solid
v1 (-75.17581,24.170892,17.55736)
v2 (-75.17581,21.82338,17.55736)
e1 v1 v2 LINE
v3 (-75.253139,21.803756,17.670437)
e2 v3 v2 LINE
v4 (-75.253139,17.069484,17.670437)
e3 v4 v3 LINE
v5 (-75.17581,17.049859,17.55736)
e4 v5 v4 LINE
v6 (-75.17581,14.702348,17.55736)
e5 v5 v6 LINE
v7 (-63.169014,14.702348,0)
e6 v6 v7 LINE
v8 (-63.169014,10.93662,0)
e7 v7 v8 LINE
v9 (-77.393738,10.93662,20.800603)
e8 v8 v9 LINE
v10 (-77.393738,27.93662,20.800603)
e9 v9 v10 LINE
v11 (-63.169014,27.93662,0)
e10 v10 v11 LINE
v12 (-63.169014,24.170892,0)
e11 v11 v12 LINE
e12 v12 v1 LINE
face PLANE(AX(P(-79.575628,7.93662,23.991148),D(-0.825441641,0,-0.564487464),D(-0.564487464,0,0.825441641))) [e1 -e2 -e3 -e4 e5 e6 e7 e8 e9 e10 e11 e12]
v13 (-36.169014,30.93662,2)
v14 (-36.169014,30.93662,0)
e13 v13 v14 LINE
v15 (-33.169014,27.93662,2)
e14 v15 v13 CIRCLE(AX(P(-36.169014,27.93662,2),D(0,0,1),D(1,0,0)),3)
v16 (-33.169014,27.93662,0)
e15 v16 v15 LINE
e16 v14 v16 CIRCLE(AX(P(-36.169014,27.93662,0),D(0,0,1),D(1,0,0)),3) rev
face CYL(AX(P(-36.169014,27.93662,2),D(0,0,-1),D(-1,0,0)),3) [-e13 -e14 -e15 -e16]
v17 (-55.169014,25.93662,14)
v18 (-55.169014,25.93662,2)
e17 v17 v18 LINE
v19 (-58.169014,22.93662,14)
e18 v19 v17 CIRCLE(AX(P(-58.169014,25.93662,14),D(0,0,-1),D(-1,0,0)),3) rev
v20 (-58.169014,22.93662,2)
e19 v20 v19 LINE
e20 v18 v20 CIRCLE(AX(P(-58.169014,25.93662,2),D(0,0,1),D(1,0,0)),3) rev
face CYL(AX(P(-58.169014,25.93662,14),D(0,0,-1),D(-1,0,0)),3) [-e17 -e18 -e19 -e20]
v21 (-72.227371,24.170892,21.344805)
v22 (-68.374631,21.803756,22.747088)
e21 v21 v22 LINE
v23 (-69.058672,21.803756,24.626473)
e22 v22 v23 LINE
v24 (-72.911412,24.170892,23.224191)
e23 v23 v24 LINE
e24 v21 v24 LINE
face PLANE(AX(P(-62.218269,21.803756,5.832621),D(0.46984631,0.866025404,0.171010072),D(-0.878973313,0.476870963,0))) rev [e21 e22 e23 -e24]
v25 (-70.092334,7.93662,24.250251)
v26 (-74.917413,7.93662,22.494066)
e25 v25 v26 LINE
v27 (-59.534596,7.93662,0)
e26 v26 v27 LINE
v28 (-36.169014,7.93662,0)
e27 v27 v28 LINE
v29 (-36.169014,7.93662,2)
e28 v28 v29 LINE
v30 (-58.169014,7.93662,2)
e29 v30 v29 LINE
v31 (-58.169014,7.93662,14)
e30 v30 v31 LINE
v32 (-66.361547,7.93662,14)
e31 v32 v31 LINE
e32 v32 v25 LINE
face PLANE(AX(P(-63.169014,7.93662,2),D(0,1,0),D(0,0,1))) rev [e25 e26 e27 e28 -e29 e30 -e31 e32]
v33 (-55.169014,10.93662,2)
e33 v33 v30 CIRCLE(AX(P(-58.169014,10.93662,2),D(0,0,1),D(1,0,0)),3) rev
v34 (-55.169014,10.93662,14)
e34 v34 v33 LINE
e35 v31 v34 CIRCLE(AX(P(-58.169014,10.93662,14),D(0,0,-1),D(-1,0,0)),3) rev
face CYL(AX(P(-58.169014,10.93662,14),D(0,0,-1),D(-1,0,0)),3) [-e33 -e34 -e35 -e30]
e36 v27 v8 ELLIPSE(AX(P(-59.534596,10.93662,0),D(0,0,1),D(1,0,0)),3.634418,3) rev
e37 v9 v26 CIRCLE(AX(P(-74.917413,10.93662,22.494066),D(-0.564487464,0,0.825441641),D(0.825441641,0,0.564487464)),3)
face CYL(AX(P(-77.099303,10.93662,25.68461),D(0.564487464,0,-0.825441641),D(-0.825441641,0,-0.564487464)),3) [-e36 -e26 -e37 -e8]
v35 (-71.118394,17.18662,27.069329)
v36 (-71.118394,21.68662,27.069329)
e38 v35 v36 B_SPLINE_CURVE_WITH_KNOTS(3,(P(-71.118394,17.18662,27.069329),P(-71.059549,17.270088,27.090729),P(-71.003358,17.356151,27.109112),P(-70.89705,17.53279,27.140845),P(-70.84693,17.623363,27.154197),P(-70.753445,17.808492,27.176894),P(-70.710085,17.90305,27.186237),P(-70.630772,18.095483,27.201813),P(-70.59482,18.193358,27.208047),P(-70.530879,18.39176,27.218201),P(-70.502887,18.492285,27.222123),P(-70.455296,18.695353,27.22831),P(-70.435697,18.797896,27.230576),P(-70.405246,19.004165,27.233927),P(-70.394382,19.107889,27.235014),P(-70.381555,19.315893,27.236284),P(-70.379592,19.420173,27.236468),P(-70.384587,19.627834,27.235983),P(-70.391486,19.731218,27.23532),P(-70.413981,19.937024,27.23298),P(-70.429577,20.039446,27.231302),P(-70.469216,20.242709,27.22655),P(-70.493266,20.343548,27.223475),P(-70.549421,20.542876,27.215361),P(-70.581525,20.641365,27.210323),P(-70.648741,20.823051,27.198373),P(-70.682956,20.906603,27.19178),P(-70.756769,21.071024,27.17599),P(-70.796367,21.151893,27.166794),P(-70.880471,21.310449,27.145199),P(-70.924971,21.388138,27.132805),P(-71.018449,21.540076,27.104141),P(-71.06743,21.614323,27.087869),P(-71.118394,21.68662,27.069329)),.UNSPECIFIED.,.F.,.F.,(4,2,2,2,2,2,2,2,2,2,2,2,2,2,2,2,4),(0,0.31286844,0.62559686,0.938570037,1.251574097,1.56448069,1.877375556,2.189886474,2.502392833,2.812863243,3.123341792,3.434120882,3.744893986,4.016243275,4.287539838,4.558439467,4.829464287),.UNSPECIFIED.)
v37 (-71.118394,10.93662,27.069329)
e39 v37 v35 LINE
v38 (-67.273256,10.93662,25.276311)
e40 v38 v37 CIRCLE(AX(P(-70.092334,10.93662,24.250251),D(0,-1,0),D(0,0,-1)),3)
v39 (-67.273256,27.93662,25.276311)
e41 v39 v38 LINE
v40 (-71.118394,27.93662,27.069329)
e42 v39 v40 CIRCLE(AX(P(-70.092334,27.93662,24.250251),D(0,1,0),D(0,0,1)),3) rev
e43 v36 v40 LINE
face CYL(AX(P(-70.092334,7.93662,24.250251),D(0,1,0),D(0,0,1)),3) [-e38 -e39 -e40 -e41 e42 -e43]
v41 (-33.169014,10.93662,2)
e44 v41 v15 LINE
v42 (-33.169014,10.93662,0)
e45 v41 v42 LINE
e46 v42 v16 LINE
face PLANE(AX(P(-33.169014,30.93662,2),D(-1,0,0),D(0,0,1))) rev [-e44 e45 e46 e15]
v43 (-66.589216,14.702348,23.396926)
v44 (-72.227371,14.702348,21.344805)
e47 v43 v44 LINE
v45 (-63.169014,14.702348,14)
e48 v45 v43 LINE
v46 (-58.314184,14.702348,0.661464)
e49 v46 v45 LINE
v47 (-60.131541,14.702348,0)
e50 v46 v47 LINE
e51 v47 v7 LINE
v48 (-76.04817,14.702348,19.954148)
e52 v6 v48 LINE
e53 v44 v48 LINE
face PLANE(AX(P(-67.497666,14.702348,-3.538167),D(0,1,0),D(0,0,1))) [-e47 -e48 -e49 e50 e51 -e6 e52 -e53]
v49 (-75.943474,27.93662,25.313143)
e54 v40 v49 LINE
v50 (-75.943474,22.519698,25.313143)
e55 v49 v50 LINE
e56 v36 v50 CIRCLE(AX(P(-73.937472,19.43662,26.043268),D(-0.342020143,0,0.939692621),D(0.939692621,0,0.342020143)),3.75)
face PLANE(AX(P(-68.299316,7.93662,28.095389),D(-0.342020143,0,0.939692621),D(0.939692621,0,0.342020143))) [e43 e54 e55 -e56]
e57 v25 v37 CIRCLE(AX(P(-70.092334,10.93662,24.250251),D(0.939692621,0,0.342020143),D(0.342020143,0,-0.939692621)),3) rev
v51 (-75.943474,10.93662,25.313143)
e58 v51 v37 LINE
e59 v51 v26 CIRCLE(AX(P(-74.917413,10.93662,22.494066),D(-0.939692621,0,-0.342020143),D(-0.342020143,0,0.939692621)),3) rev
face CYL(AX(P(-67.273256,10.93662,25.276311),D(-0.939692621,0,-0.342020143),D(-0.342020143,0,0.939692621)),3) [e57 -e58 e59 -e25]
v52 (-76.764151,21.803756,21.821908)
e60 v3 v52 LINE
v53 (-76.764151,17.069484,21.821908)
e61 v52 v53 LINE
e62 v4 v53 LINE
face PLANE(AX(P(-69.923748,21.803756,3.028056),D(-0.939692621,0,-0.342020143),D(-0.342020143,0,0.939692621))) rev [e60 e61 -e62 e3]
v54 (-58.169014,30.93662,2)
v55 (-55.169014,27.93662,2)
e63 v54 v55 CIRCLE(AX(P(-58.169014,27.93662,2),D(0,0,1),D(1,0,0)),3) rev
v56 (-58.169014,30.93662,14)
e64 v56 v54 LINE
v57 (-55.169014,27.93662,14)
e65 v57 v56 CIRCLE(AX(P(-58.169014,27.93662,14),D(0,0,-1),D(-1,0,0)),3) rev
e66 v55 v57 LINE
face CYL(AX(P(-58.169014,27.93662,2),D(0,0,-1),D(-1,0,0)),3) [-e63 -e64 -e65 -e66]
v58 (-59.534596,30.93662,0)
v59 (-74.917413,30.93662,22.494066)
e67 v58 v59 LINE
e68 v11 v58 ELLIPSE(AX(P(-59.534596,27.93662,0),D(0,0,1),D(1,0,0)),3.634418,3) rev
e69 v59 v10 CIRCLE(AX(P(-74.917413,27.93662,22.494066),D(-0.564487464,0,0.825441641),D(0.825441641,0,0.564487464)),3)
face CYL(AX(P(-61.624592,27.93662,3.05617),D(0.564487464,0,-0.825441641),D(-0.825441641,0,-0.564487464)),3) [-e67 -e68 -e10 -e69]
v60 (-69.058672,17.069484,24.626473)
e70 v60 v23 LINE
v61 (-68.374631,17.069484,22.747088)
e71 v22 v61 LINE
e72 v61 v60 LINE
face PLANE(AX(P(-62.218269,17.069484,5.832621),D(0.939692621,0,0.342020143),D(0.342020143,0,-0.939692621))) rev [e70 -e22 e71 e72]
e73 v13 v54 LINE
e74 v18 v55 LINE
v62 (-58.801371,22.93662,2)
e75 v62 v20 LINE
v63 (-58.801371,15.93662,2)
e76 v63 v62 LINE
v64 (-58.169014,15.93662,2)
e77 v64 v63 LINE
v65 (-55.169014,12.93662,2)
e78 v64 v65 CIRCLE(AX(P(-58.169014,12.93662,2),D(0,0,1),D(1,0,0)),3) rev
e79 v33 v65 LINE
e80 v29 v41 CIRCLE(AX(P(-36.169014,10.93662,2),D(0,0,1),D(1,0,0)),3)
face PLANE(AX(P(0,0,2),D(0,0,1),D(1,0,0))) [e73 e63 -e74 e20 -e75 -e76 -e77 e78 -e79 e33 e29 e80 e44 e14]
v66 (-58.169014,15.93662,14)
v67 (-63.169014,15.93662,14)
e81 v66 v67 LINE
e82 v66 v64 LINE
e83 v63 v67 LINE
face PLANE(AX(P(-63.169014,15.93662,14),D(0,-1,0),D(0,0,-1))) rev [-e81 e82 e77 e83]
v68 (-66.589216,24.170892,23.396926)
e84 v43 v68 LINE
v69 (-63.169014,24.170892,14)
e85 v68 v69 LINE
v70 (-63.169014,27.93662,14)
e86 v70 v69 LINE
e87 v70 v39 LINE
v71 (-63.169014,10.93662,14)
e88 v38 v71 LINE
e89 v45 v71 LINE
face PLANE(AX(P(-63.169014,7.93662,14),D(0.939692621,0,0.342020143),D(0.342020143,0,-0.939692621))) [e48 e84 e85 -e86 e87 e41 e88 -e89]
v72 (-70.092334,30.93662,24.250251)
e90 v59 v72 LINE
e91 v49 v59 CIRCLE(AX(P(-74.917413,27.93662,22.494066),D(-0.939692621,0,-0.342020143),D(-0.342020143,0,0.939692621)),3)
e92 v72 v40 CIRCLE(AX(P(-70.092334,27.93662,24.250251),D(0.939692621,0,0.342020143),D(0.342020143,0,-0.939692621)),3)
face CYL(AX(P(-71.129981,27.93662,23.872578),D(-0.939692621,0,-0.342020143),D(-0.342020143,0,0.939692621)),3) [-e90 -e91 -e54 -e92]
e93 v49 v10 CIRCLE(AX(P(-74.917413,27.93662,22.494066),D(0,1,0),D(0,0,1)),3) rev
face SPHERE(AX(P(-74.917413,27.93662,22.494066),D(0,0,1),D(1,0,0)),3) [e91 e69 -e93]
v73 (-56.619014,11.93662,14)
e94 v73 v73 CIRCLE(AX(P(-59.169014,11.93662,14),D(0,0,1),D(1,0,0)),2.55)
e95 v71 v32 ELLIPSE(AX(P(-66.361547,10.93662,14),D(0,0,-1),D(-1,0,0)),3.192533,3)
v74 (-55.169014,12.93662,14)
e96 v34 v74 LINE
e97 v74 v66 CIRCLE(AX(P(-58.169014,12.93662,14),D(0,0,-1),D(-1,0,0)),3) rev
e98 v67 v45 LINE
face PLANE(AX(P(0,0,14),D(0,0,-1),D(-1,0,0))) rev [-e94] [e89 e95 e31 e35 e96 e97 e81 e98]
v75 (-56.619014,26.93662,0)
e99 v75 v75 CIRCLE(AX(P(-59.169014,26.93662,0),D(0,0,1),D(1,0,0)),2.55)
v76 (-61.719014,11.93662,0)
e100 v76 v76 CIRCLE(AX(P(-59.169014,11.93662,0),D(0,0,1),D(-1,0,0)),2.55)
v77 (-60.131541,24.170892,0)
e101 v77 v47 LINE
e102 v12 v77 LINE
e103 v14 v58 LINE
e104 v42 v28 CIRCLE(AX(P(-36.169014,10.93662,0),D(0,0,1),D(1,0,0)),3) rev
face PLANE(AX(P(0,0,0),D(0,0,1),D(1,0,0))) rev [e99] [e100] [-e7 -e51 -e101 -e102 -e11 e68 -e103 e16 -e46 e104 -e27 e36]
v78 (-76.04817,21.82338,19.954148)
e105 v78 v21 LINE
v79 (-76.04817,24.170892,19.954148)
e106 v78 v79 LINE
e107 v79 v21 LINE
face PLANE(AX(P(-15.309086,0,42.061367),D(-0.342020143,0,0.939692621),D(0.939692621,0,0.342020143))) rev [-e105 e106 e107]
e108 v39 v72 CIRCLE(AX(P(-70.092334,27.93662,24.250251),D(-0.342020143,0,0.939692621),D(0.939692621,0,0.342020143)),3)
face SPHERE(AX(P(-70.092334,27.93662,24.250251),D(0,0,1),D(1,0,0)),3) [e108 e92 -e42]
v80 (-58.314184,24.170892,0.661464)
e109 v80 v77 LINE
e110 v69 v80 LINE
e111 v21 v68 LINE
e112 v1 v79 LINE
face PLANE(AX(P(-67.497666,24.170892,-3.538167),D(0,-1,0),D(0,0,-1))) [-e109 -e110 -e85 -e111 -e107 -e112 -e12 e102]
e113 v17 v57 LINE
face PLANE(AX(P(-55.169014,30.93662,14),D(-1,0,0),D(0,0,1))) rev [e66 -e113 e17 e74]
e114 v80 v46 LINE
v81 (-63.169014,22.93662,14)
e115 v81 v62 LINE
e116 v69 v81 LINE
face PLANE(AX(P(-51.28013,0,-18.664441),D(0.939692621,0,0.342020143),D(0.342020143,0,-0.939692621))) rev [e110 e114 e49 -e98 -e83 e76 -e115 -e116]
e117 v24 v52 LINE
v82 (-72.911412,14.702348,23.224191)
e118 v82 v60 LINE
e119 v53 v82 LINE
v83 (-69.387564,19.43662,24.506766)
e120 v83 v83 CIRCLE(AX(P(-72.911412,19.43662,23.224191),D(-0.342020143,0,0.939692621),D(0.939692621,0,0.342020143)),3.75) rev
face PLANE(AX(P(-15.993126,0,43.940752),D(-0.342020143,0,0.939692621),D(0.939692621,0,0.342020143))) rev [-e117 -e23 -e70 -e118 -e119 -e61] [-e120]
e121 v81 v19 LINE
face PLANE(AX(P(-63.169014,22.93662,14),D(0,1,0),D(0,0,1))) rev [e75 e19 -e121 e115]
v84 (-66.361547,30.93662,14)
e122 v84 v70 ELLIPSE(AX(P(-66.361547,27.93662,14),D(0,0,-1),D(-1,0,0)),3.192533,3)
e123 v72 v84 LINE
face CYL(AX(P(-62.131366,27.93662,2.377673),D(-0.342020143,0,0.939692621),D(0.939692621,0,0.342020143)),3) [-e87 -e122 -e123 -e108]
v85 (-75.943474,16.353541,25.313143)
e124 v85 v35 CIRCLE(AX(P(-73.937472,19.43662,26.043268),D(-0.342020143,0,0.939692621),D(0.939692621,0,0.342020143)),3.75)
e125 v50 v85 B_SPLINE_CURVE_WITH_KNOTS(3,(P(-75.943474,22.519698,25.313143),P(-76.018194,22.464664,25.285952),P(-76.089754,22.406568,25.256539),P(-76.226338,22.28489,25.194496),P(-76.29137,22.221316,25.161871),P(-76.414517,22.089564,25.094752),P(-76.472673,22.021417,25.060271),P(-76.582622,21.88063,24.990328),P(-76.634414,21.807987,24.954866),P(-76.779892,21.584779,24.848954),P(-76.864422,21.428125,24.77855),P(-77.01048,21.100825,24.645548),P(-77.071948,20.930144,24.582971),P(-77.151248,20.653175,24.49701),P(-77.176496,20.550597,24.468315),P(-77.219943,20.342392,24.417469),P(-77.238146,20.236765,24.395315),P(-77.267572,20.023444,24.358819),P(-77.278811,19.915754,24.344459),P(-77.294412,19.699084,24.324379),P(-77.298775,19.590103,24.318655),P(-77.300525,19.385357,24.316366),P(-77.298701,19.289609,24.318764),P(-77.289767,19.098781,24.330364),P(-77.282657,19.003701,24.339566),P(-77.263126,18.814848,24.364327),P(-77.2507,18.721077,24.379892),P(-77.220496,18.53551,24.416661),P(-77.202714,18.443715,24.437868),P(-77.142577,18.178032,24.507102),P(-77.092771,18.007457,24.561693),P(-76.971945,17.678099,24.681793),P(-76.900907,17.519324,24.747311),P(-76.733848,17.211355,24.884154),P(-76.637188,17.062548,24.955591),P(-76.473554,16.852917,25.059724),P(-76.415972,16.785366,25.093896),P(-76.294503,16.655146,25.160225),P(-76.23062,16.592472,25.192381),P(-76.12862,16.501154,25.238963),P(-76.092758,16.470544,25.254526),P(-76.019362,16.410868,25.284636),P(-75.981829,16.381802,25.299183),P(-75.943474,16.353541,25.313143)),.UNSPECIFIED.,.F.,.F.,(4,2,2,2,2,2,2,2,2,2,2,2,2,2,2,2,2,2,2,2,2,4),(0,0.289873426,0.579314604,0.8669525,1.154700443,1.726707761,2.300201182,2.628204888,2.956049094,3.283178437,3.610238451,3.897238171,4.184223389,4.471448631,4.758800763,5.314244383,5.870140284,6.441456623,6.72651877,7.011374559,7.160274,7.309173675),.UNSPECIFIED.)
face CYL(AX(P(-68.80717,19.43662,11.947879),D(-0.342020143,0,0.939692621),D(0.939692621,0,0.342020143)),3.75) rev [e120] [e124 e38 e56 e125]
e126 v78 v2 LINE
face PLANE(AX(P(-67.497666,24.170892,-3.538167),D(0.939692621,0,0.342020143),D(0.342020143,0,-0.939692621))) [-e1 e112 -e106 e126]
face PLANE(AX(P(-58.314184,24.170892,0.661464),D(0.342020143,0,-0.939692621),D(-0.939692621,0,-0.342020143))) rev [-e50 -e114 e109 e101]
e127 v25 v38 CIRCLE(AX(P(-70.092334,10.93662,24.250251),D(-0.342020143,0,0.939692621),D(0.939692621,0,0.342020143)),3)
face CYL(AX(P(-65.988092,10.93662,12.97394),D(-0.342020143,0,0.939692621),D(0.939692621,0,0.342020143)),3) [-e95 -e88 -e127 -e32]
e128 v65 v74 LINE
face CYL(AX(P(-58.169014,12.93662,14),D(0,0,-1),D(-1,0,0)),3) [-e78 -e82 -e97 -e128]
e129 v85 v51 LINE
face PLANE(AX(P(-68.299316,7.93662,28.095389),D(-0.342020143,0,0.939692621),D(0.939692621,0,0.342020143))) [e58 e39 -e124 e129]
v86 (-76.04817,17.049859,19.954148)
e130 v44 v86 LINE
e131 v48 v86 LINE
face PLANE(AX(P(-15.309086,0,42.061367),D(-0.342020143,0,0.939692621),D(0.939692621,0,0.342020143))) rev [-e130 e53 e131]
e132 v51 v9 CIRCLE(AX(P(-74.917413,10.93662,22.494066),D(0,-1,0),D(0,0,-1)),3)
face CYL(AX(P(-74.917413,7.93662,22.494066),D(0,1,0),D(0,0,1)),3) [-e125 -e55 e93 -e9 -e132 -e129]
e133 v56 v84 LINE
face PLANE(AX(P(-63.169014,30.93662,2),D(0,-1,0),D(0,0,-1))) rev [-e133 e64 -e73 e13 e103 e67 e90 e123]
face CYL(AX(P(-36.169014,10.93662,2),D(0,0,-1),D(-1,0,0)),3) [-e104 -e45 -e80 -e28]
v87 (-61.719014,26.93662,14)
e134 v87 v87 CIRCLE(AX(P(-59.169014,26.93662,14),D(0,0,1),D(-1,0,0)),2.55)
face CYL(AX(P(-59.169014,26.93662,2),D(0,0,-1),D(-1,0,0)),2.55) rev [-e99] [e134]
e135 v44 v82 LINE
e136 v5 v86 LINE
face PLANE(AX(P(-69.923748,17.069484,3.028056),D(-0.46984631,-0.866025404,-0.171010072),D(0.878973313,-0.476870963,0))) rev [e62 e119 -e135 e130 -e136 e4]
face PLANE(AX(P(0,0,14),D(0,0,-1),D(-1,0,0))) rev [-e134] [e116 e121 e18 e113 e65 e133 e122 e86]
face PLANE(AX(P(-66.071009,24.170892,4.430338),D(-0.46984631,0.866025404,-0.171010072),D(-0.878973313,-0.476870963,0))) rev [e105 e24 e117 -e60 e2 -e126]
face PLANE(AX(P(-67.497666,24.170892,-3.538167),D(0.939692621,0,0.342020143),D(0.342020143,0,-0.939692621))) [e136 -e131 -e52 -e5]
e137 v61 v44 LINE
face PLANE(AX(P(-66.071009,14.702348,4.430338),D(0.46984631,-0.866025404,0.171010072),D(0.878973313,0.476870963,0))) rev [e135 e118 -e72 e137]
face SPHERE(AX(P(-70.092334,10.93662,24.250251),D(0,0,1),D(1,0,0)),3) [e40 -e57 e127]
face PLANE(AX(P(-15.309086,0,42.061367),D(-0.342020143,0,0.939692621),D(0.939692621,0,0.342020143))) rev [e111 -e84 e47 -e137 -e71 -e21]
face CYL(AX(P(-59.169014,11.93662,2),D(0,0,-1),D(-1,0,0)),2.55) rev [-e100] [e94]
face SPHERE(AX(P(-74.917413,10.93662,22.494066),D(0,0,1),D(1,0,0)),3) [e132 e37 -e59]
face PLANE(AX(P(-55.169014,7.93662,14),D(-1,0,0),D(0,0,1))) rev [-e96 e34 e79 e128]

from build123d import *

# Parameters (mm, degrees)
CROQUIS3_W              = 30
CROQUIS3_H              = 23
CROQUIS3_R              = 2.55
SALIENTE_EXTRUIR2_DEPTH = 2
CROQUIS5_W              = 8
CROQUIS5_H              = 8
CROQUIS5_R              = 2.55
SALIENTE_EXTRUIR3_DEPTH = 12
SALIENTE_EXTRUIR4_DEPTH = 23
CROQUIS7_R              = 3.75
CORTAR_EXTRUIR1_DEPTH   = 15
CORTAR_EXTRUIR7_START   = -3
CORTAR_EXTRUIR7_DEPTH   = 20
CORTAR_EXTRUIR8_START   = 2
CROQUIS14_W             = 8.13201816
CROQUIS14_H             = 9.468544415
CORTAR_EXTRUIR8_DEPTH   = 25
CROQUIS15_W             = 24.194573687
CROQUIS15_H             = 9.468544415
CORTAR_EXTRUIR9_DEPTH   = 1.933991
REDONDEO1_R             = 3


with BuildPart() as part:
    # Croquis3 → Saliente-Extruir2 (new body)
    with BuildSketch(Plane.XY):
        with Locations((-48.169014085, 19.436619718)):
            Rectangle(CROQUIS3_W, CROQUIS3_H)
        with Locations((-59.169014085, 26.936619718)):
            Circle(CROQUIS3_R, mode=Mode.SUBTRACT)
        with Locations(Location((-59.169014085, 11.936619718, 0), (0, 0, 180))):
            Circle(CROQUIS3_R, mode=Mode.SUBTRACT)
    extrude(amount=SALIENTE_EXTRUIR2_DEPTH)

    # Croquis5 → Saliente-Extruir3 (add)
    # profile 1 of 2: a face of its own
    with BuildSketch(Plane.XY.offset(2)):
        with Locations((-59.169014085, 11.936619718)):
            Rectangle(CROQUIS5_W, CROQUIS5_H)
        with Locations(Location((-59.169014085, 11.936619718, 0), (0, 0, 180))):
            Circle(CROQUIS5_R, mode=Mode.SUBTRACT)
    # profile 2 of 2: a face of its own
    with BuildSketch(Plane.XY.offset(2)):
        with Locations((-59.169014085, 26.936619718)):
            Rectangle(CROQUIS5_W, CROQUIS5_H)
        with Locations(Location((-59.169014085, 26.936619718, 0), (0, 0, 180))):
            Circle(CROQUIS5_R, mode=Mode.SUBTRACT)
    extrude(amount=SALIENTE_EXTRUIR3_DEPTH)

    # Croquis6 → Saliente-Extruir4 (add)
    with BuildSketch(Plane(origin=(0, 30.936619718, 0), x_dir=(1, 0, 0), z_dir=(0, 1, 0))):
        Polygon((-63.169014085, -14), (-68.299316234, -28.095389312), (-79.575627684, -23.991147592), (-63.169014085, 0), align=None)
    extrude(amount=-SALIENTE_EXTRUIR4_DEPTH)

    # Croquis7 → Cortar-Extruir1 (cut)
    with BuildSketch(Plane(origin=(-17.019186352, 0, 46.759830198), x_dir=(0.9396926207859082, 0, 0.3420201433256694), z_dir=(-0.3420201433256694, 0, 0.9396926207859083))):
        with Locations((-60.571174391, 19.436619718)):
            Circle(CROQUIS7_R)
    extrude(amount=-CORTAR_EXTRUIR1_DEPTH, mode=Mode.SUBTRACT)

    # Croquis13 → Cortar-Extruir7 (cut)
    with BuildSketch(Plane(origin=(-17.019186352, 0, 46.759830198), x_dir=(0.9396926207859082, 0, 0.3420201433256694), z_dir=(-0.3420201433256694, 0, 0.9396926207859083)).offset(CORTAR_EXTRUIR7_START)):
        Polygon((-60.571174391, 14.702347511), (-56.471174391, 17.069483615), (-56.471174391, 21.803755822), (-60.571174391, 24.170891926), (-64.671174391, 21.803755822), (-64.671174391, 17.069483615), align=None)
    extrude(amount=-CORTAR_EXTRUIR7_DEPTH, mode=Mode.SUBTRACT)

    # Croquis14 → Cortar-Extruir8 (cut)
    with BuildSketch(Plane(origin=(-15.993125922, 0, 43.940752336), x_dir=(-0.9396926207859081, 0, -0.34202014332566977), z_dir=(0.3420201433256697, 0, -0.939692620785908)).offset(CORTAR_EXTRUIR8_START)):
        with Locations((60.571174391, 19.436619719)):
            Rectangle(CROQUIS14_W, CROQUIS14_H)
    extrude(amount=CORTAR_EXTRUIR8_DEPTH, mode=Mode.SUBTRACT)

    # Croquis15 → Cortar-Extruir9 (cut)
    with BuildSketch(Plane(origin=(-53.097486879, 0, -19.325904738), x_dir=(-0.34202014332566977, 0, 0.9396926207859081), z_dir=(-0.939692620785908, 0, -0.3420201433256697))):
        with Locations((32.663485099, 19.436619719)):
            Rectangle(CROQUIS15_W, CROQUIS15_H)
    extrude(amount=-CORTAR_EXTRUIR9_DEPTH, mode=Mode.SUBTRACT)

    # Redondeo1
    # the kernel refuses this fillet: 3 mm, written as the material it takes off along each edge
    with BuildSketch(Plane(origin=(-70.092333667, 10.936619718, 24.250251019), x_dir=(0.9396926207859081, 0, 0.34202014332566966), z_dir=(0, -1, 0))) as redondeo1_piece_1_section:
        Polygon((0, 0), (REDONDEO1_R * 1.02, 0), (REDONDEO1_R * 1.02, REDONDEO1_R * 1.02), (0, REDONDEO1_R * 1.02), align=None)
    redondeo1_piece_1 = extrude(amount=REDONDEO1_R * 1.02, mode=Mode.PRIVATE)
    redondeo1_piece_1 = redondeo1_piece_1 - Plane(origin=(-70.092333667, 10.936619718, 24.250251019), x_dir=(-0.4226182617406987, 0, -0.9063077870366504), z_dir=(0, -1, 0)) * Sphere(REDONDEO1_R, mode=Mode.PRIVATE)
    add(redondeo1_piece_1, mode=Mode.SUBTRACT)
    with BuildSketch(Plane(origin=(-74.917413437, 10.936619718, 22.494065605), x_dir=(-0.3420201433256695, 0, 0.9396926207859081), z_dir=(0, -1, 0))) as redondeo1_piece_2_section:
        Polygon((0, 0), (REDONDEO1_R * 1.02, 0), (REDONDEO1_R * 1.02, REDONDEO1_R * 1.31418750187), (-REDONDEO1_R * 0.253089576506, REDONDEO1_R * 0.988102052555), align=None)
    redondeo1_piece_2 = extrude(amount=REDONDEO1_R * 1.02, mode=Mode.PRIVATE)
    redondeo1_piece_2 = redondeo1_piece_2 - Plane(origin=(-74.917413437, 10.936619718, 22.494065605), x_dir=(0.9520405381935744, 0, -0.30597191641732324), z_dir=(0, -1, 0)) * Sphere(REDONDEO1_R, mode=Mode.PRIVATE)
    add(redondeo1_piece_2, mode=Mode.SUBTRACT)
    with BuildSketch(Plane(origin=(-70.092333667, 27.936619718, 24.250251019), x_dir=(0.9396926207859081, 0, 0.34202014332566966), z_dir=(0, 1, 0))) as redondeo1_piece_3_section:
        Polygon((0, 0), (REDONDEO1_R * 1.02, 0), (REDONDEO1_R * 1.02, -REDONDEO1_R * 1.02), (0, -REDONDEO1_R * 1.02), align=None)
    redondeo1_piece_3 = extrude(amount=REDONDEO1_R * 1.02, mode=Mode.PRIVATE)
    redondeo1_piece_3 = redondeo1_piece_3 - Plane(origin=(-70.092333667, 27.936619718, 24.250251019), x_dir=(-0.4226182617406987, 0, -0.9063077870366504), z_dir=(0, 1, 0)) * Sphere(REDONDEO1_R, mode=Mode.PRIVATE)
    add(redondeo1_piece_3, mode=Mode.SUBTRACT)
    with BuildSketch(Plane(origin=(-74.917413437, 27.936619718, 22.494065605), x_dir=(-0.3420201433256695, 0, 0.9396926207859081), z_dir=(0, 1, 0))) as redondeo1_piece_4_section:
        Polygon((0, 0), (REDONDEO1_R * 1.02, 0), (REDONDEO1_R * 1.02, -REDONDEO1_R * 1.31418750187), (-REDONDEO1_R * 0.253089576506, -REDONDEO1_R * 0.988102052555), align=None)
    redondeo1_piece_4 = extrude(amount=REDONDEO1_R * 1.02, mode=Mode.PRIVATE)
    redondeo1_piece_4 = redondeo1_piece_4 - Plane(origin=(-74.917413437, 27.936619718, 22.494065605), x_dir=(0.9520405381935744, 0, -0.30597191641732324), z_dir=(0, 1, 0)) * Sphere(REDONDEO1_R, mode=Mode.PRIVATE)
    add(redondeo1_piece_4, mode=Mode.SUBTRACT)
    with BuildSketch(Plane(origin=(-55.169014085, 7.936619718, 2), x_dir=(0, 1, 0), z_dir=(0, 0, 1)), Plane(origin=(-55.169014085, 15.936619718, 2), x_dir=(-1, 0, 0), z_dir=(0, 0, 1)), Plane(origin=(-55.169014085, 30.936619718, 2), x_dir=(-1, 0, 0), z_dir=(0, 0, 1))) as redondeo1_piece_5:
        with BuildLine():
            CenterArc((REDONDEO1_R, REDONDEO1_R), REDONDEO1_R, 180, 90)
            Line((0, REDONDEO1_R), (0, 0))
            Line((0, 0), (REDONDEO1_R, 0))
        make_face()
    extrude(amount=19.5, mode=Mode.SUBTRACT)
    with BuildSketch(Plane(origin=(-55.169014085, 22.936619718, 2), x_dir=(-1, 0, 0), z_dir=(0, 0, 1))) as redondeo1_piece_6:
        with BuildLine():
            CenterArc((REDONDEO1_R, -REDONDEO1_R), REDONDEO1_R, 90, 90)
            Line((0, -REDONDEO1_R), (0, 0))
            Line((0, 0), (REDONDEO1_R, 0))
        make_face()
    extrude(amount=19.5, mode=Mode.SUBTRACT)
    with BuildSketch(Plane(origin=(-60.60386301, 7.936619718, 6.952305344), x_dir=(0, 1, 0), z_dir=(-0.34202014332566966, 0, 0.9396926207859081))) as redondeo1_piece_7_section:
        with BuildLine():
            CenterArc((REDONDEO1_R, REDONDEO1_R), REDONDEO1_R, 180, 90)
            Line((0, REDONDEO1_R), (0, 0))
            Line((0, 0), (REDONDEO1_R, 0))
        make_face()
    redondeo1_piece_7 = extrude(amount=19.5, mode=Mode.PRIVATE)
    redondeo1_piece_7 = split(redondeo1_piece_7, bisect_by=Plane(origin=(-65.882719938, 8.612486754, 14), z_dir=(0, 0, 1)), keep=Keep.TOP, mode=Mode.PRIVATE)
    add(redondeo1_piece_7, mode=Mode.SUBTRACT)
    with BuildSketch(Plane(origin=(-71.118394097, 7.936619718, 27.069328882), x_dir=(0.3420201433256695, 0, -0.9396926207859081), z_dir=(-0.9396926207859081, 0, -0.3420201433256695))) as redondeo1_piece_8:
        with BuildLine():
            CenterArc((REDONDEO1_R, -REDONDEO1_R), REDONDEO1_R, 90, 90)
            Line((0, -REDONDEO1_R), (0, 0))
            Line((0, 0), (REDONDEO1_R, 0))
        make_face()
    extrude(amount=5.134742642, mode=Mode.SUBTRACT)
    with BuildSketch(Plane(origin=(-68.299316234, 27.936619718, 28.095389312), x_dir=(0.34202014332566905, 0, -0.9396926207859082), z_dir=(0, -1, 0)), Plane(origin=(-33.169014085, 7.936619718, -7.5), x_dir=(-1, 0, 0), z_dir=(0, 0, 1))) as redondeo1_piece_9:
        with BuildLine():
            CenterArc((REDONDEO1_R, -REDONDEO1_R), REDONDEO1_R, 90, 90)
            Line((0, -REDONDEO1_R), (0, 0))
            Line((0, 0), (REDONDEO1_R, 0))
        make_face()
    extrude(amount=17, mode=Mode.SUBTRACT)
    with BuildSketch(Plane(origin=(-77.393738361, 7.936619718, 20.800603214), x_dir=(0.8254416413123481, 0, 0.5644874638001954), z_dir=(0.5644874638001954, 0, -0.8254416413123482))) as redondeo1_piece_10:
        with BuildLine():
            CenterArc((REDONDEO1_R, -REDONDEO1_R), REDONDEO1_R, 90, 90)
            Line((0, -REDONDEO1_R), (0, 0))
            Line((0, 0), (REDONDEO1_R, 0))
        make_face()
    extrude(amount=32.699362587, mode=Mode.SUBTRACT)
    with BuildSketch(Plane(origin=(-79.575627684, 27.936619718, 23.991147592), x_dir=(0.9396926207859081, 0, 0.3420201433256696), z_dir=(0, -1, 0))) as redondeo1_piece_11:
        with BuildLine():
            CenterArc((REDONDEO1_R * 1.28841911948, -REDONDEO1_R), REDONDEO1_R, 90, 104.366707449)
            Line((REDONDEO1_R * 0.319691616972, -REDONDEO1_R * 1.24812703579), (0, 0))
            Line((0, 0), (REDONDEO1_R * 1.28841911948, 0))
        make_face()
    extrude(amount=17, mode=Mode.SUBTRACT)
    with BuildSketch(Plane(origin=(-77.393738361, 30.936619718, 20.800603214), x_dir=(0.8254416413123481, 0, 0.5644874638001954), z_dir=(0.5644874638001954, 0, -0.8254416413123482))) as redondeo1_piece_12:
        with BuildLine():
            CenterArc((REDONDEO1_R, REDONDEO1_R), REDONDEO1_R, 180, 90)
            Line((0, REDONDEO1_R), (0, 0))
            Line((0, 0), (REDONDEO1_R, 0))
        make_face()
    extrude(amount=32.699362587, mode=Mode.SUBTRACT)
    with BuildSketch(Plane(origin=(-71.118394097, 30.936619718, 27.069328882), x_dir=(0.3420201433256695, 0, -0.9396926207859081), z_dir=(-0.9396926207859081, 0, -0.3420201433256695))) as redondeo1_piece_13:
        with BuildLine():
            CenterArc((REDONDEO1_R, REDONDEO1_R), REDONDEO1_R, 180, 90)
            Line((0, REDONDEO1_R), (0, 0))
            Line((0, 0), (REDONDEO1_R, 0))
        make_face()
    extrude(amount=5.134742642, mode=Mode.SUBTRACT)
    with BuildSketch(Plane(origin=(-60.60386301, 30.936619718, 6.952305344), x_dir=(-0.9396926207859081, 0, -0.3420201433256697), z_dir=(-0.34202014332566966, 0, 0.9396926207859081))) as redondeo1_piece_14_section:
        with BuildLine():
            CenterArc((REDONDEO1_R, REDONDEO1_R), REDONDEO1_R, 180, 90)
            Line((0, REDONDEO1_R), (0, 0))
            Line((0, 0), (REDONDEO1_R, 0))
        make_face()
    redondeo1_piece_14 = extrude(amount=19.5, mode=Mode.PRIVATE)
    redondeo1_piece_14 = split(redondeo1_piece_14, bisect_by=Plane(origin=(-65.882719938, 30.260752682, 14), z_dir=(0, 0, 1)), keep=Keep.TOP, mode=Mode.PRIVATE)
    add(redondeo1_piece_14, mode=Mode.SUBTRACT)
    with BuildSketch(Plane(origin=(-33.169014085, 30.936619718, -7.5), x_dir=(-1, 0, 0), z_dir=(0, 0, 1))) as redondeo1_piece_15:
        with BuildLine():
            CenterArc((REDONDEO1_R, REDONDEO1_R), REDONDEO1_R, 180, 90)
            Line((0, REDONDEO1_R), (0, 0))
            Line((0, 0), (REDONDEO1_R, 0))
        make_face()
    extrude(amount=17, mode=Mode.SUBTRACT)


solid = part.part
